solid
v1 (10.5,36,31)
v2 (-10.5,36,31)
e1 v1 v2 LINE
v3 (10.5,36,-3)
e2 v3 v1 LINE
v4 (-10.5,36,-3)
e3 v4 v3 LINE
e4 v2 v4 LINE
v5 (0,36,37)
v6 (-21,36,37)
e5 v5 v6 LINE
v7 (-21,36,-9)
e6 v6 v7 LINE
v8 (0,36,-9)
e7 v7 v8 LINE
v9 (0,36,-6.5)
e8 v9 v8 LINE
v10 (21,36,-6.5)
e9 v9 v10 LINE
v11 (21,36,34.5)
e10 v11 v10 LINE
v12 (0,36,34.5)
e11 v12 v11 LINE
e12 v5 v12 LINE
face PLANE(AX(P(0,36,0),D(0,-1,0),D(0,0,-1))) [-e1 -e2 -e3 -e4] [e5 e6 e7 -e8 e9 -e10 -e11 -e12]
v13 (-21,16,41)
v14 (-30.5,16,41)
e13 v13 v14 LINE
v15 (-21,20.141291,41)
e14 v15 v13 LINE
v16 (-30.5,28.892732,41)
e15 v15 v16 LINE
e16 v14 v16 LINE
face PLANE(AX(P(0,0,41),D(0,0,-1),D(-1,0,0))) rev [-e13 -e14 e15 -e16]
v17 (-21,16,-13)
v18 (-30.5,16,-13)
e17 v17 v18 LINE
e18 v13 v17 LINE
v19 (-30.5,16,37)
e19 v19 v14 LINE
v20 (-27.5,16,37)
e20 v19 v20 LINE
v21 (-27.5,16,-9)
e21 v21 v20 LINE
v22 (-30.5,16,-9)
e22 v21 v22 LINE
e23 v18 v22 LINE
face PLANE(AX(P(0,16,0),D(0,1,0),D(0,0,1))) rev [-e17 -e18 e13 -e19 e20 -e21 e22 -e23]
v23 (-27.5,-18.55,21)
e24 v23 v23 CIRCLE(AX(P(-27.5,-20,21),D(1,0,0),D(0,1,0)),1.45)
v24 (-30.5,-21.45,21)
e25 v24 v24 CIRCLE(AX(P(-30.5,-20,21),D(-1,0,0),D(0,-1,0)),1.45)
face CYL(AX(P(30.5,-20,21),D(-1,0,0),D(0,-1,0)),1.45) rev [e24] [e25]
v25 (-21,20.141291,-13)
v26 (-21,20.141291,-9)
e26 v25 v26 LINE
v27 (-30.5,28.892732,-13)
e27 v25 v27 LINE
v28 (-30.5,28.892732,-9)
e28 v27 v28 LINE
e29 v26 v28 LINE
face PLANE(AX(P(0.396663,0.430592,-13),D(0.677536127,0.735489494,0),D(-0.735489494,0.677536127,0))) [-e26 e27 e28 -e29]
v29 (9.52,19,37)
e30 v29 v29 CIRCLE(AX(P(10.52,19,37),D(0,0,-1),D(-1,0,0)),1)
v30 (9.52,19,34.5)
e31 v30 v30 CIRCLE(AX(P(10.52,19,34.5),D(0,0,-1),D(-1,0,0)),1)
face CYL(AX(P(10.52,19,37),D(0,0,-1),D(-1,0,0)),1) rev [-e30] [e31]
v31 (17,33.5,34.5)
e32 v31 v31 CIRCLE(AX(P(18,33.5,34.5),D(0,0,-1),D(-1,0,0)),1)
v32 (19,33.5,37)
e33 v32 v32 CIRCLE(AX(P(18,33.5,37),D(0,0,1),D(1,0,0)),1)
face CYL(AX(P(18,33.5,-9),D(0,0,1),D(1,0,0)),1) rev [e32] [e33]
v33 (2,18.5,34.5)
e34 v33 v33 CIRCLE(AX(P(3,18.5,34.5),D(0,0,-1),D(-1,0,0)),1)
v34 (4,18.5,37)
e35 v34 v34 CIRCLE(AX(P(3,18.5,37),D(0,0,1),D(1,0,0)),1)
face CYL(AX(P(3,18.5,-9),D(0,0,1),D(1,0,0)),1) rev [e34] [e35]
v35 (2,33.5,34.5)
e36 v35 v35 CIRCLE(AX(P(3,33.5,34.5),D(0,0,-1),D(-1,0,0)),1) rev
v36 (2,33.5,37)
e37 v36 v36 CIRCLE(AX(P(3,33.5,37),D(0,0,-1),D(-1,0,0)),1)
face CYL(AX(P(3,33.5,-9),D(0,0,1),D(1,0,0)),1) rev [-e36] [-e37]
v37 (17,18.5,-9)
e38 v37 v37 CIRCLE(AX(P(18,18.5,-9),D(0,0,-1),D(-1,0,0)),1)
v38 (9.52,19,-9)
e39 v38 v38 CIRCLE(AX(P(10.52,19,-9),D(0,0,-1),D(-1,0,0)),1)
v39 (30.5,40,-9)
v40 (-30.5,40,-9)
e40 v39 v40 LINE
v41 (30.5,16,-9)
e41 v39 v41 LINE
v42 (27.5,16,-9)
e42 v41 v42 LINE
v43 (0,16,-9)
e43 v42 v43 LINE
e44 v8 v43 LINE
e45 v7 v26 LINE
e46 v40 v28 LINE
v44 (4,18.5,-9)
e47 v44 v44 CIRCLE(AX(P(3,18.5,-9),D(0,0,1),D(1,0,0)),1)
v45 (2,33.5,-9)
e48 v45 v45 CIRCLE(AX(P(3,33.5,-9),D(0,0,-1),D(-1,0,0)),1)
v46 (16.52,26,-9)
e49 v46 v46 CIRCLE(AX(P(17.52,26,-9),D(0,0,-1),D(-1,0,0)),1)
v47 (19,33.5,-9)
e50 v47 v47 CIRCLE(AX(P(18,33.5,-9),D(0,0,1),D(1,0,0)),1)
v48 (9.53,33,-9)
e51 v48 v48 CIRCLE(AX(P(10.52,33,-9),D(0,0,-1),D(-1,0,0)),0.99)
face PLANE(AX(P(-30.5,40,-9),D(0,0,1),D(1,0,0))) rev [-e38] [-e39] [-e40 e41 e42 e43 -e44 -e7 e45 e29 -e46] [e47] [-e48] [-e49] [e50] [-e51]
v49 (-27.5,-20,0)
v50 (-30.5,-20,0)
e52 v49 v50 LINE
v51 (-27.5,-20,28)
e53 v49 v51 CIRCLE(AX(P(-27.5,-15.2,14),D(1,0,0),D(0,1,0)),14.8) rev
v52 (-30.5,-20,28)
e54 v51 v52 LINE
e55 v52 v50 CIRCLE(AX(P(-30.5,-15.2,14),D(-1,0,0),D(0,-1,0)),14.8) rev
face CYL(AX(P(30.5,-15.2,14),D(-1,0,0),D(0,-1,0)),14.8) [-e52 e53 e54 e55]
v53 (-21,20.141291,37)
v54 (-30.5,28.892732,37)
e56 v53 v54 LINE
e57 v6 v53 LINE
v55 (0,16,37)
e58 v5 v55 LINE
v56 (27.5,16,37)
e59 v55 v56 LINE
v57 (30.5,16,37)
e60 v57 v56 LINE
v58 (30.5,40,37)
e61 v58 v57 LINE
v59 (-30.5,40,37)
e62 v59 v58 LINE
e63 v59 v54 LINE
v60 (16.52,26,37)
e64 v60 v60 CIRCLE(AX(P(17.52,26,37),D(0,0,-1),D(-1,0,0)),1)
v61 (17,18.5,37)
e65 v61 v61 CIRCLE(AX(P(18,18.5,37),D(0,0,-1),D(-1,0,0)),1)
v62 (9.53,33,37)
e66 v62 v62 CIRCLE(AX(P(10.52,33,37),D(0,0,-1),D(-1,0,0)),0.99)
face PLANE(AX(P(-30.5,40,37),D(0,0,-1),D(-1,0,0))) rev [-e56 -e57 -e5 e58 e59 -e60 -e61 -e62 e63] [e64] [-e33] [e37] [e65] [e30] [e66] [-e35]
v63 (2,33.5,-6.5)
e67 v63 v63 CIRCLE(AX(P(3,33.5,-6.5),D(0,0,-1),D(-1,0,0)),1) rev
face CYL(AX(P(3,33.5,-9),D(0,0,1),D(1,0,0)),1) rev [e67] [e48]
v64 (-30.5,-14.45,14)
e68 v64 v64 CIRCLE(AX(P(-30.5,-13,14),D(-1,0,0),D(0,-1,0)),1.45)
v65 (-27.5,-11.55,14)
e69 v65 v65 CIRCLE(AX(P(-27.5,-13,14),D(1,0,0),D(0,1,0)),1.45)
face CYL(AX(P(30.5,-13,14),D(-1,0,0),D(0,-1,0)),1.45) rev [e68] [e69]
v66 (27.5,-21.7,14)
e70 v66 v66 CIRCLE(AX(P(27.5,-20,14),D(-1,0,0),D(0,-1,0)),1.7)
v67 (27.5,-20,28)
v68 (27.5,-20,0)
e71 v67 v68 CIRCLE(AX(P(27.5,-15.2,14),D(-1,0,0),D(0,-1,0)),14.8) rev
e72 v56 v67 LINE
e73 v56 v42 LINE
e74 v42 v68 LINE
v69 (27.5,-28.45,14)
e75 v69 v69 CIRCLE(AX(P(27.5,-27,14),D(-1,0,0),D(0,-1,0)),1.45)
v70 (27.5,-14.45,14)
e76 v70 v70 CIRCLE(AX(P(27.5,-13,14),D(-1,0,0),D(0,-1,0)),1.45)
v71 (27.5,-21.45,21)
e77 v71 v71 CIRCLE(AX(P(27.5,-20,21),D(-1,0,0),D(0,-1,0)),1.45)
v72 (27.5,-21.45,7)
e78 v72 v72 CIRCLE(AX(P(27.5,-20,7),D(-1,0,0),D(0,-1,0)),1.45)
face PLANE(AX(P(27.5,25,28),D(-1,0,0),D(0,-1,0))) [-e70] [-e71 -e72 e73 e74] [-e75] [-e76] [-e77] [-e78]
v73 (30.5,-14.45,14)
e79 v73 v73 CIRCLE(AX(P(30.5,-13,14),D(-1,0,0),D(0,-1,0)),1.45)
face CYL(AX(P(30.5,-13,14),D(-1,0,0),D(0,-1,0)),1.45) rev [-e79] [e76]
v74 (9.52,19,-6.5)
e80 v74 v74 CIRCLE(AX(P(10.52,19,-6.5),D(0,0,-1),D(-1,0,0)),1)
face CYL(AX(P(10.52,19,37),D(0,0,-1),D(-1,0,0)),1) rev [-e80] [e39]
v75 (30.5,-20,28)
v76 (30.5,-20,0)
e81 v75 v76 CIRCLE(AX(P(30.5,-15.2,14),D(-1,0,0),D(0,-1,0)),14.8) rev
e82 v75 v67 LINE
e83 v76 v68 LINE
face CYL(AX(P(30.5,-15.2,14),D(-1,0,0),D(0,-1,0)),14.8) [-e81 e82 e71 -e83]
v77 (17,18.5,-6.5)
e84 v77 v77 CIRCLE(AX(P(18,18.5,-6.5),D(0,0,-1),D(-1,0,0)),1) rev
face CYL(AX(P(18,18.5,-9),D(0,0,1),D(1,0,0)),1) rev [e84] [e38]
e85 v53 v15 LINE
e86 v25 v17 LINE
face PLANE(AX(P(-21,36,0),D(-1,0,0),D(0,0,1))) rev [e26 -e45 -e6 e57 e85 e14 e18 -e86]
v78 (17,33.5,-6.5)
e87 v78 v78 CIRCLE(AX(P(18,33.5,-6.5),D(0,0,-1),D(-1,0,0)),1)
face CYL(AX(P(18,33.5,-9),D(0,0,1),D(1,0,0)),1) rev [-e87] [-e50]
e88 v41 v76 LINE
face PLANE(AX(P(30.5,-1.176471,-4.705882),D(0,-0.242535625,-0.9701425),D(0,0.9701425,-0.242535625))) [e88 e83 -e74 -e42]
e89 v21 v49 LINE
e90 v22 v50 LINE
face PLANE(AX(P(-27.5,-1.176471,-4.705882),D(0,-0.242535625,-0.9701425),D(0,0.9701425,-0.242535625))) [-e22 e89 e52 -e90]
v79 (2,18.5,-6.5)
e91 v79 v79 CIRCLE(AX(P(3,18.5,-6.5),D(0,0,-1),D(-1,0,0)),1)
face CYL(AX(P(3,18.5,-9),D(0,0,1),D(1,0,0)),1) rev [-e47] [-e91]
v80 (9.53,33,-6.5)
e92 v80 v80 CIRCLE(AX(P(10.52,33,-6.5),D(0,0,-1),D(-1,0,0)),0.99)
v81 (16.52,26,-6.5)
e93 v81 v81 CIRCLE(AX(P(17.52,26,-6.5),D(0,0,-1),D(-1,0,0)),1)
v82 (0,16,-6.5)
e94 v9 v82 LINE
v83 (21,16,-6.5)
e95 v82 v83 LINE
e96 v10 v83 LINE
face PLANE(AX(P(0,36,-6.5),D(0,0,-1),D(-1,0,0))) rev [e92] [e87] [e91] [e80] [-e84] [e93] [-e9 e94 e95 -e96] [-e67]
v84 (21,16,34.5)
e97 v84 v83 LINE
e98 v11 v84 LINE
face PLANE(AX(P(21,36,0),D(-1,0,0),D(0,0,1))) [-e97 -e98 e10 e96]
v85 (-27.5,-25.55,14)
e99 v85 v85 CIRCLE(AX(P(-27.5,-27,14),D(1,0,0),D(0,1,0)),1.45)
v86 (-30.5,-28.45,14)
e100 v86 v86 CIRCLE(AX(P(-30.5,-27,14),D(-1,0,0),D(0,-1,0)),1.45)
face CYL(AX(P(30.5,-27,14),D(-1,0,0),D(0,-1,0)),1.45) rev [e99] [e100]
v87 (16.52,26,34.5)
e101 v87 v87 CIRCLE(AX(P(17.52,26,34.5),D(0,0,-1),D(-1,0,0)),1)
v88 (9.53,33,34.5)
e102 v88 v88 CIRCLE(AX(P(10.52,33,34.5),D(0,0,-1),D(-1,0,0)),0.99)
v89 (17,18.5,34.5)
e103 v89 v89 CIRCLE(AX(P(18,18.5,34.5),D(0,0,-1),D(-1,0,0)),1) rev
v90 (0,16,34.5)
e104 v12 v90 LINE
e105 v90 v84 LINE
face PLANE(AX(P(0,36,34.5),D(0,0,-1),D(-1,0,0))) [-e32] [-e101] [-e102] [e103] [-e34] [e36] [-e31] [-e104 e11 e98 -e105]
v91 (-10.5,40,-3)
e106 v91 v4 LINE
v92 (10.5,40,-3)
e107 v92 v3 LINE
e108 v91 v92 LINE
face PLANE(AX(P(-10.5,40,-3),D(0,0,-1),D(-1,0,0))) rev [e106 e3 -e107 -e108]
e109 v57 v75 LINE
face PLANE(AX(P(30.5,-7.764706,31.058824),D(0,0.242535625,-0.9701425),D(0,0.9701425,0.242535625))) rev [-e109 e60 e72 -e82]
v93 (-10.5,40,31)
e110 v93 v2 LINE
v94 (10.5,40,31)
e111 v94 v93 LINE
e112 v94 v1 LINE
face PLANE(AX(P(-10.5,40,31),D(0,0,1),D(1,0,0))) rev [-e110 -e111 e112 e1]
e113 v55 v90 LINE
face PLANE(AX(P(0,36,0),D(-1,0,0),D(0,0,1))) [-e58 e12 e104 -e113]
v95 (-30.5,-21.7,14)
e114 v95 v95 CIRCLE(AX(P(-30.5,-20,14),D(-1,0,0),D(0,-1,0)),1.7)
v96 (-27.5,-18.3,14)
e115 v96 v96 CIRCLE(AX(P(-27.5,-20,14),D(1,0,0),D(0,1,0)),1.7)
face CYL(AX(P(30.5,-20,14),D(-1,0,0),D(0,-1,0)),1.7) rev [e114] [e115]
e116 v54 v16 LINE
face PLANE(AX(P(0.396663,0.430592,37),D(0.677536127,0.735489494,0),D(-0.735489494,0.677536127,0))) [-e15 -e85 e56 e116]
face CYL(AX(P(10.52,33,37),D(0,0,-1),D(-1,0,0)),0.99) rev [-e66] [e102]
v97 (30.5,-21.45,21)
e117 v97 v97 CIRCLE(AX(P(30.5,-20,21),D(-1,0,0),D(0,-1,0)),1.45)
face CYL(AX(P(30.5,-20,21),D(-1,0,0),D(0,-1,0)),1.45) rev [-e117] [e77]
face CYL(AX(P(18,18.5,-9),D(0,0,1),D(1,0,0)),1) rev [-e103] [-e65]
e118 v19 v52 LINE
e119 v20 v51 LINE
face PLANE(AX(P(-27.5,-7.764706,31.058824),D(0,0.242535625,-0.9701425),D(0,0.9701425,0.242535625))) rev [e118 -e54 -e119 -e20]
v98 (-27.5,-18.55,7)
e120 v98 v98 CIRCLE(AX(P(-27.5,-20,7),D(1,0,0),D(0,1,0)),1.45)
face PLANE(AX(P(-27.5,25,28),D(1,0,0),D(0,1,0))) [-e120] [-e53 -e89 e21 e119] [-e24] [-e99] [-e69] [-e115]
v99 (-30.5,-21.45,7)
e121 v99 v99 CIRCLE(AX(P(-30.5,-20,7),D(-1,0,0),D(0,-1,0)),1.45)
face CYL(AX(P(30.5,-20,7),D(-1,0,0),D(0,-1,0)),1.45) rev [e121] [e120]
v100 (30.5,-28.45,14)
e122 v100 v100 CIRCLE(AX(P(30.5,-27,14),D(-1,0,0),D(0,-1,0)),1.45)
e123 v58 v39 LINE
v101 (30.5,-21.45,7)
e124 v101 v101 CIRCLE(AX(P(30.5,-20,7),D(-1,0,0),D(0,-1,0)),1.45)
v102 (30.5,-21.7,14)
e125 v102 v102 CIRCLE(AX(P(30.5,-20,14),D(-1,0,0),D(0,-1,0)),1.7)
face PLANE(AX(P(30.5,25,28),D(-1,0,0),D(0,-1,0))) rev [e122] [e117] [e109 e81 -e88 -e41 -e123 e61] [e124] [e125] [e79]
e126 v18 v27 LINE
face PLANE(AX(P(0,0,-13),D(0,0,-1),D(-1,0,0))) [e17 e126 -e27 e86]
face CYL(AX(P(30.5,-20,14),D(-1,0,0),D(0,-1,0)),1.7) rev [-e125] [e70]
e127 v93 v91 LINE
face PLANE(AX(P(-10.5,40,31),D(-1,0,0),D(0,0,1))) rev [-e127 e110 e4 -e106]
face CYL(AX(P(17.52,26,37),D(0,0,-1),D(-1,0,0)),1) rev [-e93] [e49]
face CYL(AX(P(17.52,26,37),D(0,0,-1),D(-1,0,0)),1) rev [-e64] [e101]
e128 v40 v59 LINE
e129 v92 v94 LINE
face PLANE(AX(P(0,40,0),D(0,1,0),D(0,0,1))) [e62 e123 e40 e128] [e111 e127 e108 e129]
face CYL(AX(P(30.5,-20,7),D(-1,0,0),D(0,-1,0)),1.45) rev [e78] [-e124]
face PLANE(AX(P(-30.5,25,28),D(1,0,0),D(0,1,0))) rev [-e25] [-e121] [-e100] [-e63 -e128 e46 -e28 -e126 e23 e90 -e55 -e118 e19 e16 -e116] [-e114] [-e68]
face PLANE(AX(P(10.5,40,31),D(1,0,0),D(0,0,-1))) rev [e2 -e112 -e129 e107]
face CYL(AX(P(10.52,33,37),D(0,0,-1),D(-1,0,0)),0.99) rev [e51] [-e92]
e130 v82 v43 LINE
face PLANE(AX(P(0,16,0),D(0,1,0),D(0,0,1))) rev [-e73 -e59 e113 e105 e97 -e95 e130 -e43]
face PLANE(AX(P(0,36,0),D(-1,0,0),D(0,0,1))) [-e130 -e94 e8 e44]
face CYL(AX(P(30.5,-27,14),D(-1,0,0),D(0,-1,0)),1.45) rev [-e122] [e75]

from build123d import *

# Parameters (mm, degrees)
SM_BASE_FLANGE_2_DEPTH = 28
SKETCH_15_W            = 61
SKETCH_15_H            = 46
EXTRUDE_1_DEPTH        = 12
SKETCH_18_W            = 21
SKETCH_18_H            = 2.5
SKETCH_18_W_2          = 42
SKETCH_18_H_2          = 41
CUT_EXTRUDE_1_DEPTH    = 20
SKETCH_19_R            = 1
CUT_EXTRUDE_2_DEPTH    = 69.163406605
SKETCH_20_W            = 21
SKETCH_20_H            = 34
CUT_EXTRUDE_3_DEPTH    = 4
EXTRUDE_2_DEPTH        = 3
PATTERN_LINEAR_1_COUNT = 2
PATTERN_LINEAR_1_PITCH = 58
SKETCH_23_R            = 1.45
SKETCH_23_R_2          = 1.7
CUT_EXTRUDE_4_DEPTH    = 82.792420187
SKETCH_24_R            = 1
SKETCH_24_R_2          = 0.99
CUT_EXTRUDE_5_DEPTH    = 69.163406605
EXTRUDE_3_DEPTH        = 4
PATTERN_LINEAR_2_COUNT = 2
PATTERN_LINEAR_2_PITCH = 50


# Sheet-metal steps are written as plain solids
with BuildPart() as part:
    # 草图1 → 基体-法兰2 (new body)
    with BuildSketch(Plane.XY):
        with BuildLine():
            Line((-27.5, -30), (-27.5, 23))
            ThreePointArc((-27.5, 23), (-26.914213562, 24.414213562), (-25.5, 25))
            Line((-25.5, 25), (25.5, 25))
            ThreePointArc((25.5, 25), (26.914213562, 24.414213562), (27.5, 23))
            Line((27.5, 23), (27.5, -30))
            Line((27.5, -30), (30.5, -30))
            Line((30.5, -30), (30.5, 23))
            ThreePointArc((30.5, 23), (29.035533906, 26.535533906), (25.5, 28))
            Line((25.5, 28), (-25.5, 28))
            ThreePointArc((-25.5, 28), (-29.035533906, 26.535533906), (-30.5, 23))
            Line((-30.5, 23), (-30.5, -30))
            Line((-30.5, -30), (-27.5, -30))
        make_face()
    extrude(amount=SM_BASE_FLANGE_2_DEPTH)

    # 草图15 → 凸台-拉伸1 (add, symmetric)
    with BuildSketch(Plane(origin=(0, 28, 0), x_dir=(1, 0, 0), z_dir=(0, 1, 0))):
        with Locations((0, -14)):
            Rectangle(SKETCH_15_W, SKETCH_15_H)
    extrude(amount=EXTRUDE_1_DEPTH, both=True)

    # 草图18 → 切除-拉伸1 (cut)
    with BuildSketch(Plane.XZ.offset(-16)):
        with Locations((-10.5, 35.75)):
            Rectangle(SKETCH_18_W, SKETCH_18_H)
        with Locations((0, 14)):
            Rectangle(SKETCH_18_W_2, SKETCH_18_H_2)
        with Locations((-10.5, -7.75)):
            Rectangle(SKETCH_18_W, SKETCH_18_H)
    extrude(amount=-CUT_EXTRUDE_1_DEPTH, mode=Mode.SUBTRACT)

    # 草图19 → 切除-拉伸2 (cut, through all)
    with BuildSketch(Plane.XY.offset(37)):
        with Locations((3, 18.5)):
            Circle(SKETCH_19_R)
        with Locations(Location((18, 18.5, 0), (0, 0, 180))):
            Circle(SKETCH_19_R)
        with Locations((18, 33.5)):
            Circle(SKETCH_19_R)
        with Locations(Location((3, 33.5, 0), (0, 0, 180))):
            Circle(SKETCH_19_R)
    extrude(amount=-CUT_EXTRUDE_2_DEPTH, mode=Mode.SUBTRACT)

    # 草图20 → 切除-拉伸3 (cut)
    with BuildSketch(Plane.XZ.offset(-36)):
        with Locations((0, 14)):
            Rectangle(SKETCH_20_W, SKETCH_20_H)
    extrude(amount=-CUT_EXTRUDE_3_DEPTH, mode=Mode.SUBTRACT)

    # 草图21 → 凸台-拉伸2 (add)
    with BuildSketch(Plane.ZY.offset(30.5)):
        Polygon((0, 16), (-9, 16), (0, -20), align=None)
        Polygon((28, 16), (28, -20), (37, 16), align=None)
    extrude_2 = extrude(amount=-EXTRUDE_2_DEPTH)

    # 阵列(线性)1: 凸台-拉伸2 ×2
    with Locations(*[(i * PATTERN_LINEAR_1_PITCH, 0, 0) for i in range(1, PATTERN_LINEAR_1_COUNT)]):
        add(extrude_2)

    # 草图23 → 切除-拉伸4 (cut, through all)
    with BuildSketch(Plane.ZY.offset(30.5)):
        with Locations(Location((14, -13, 0), (0, 0, 270))):
            Circle(SKETCH_23_R)
        with Locations(Location((7, -20, 0), (0, 0, 270))):
            Circle(SKETCH_23_R)
        with Locations(Location((14, -20, 0), (0, 0, 270))):
            Circle(SKETCH_23_R_2)
        with Locations(Location((21, -20, 0), (0, 0, 270))):
            Circle(SKETCH_23_R)
        with Locations(Location((14, -27, 0), (0, 0, 270))):
            Circle(SKETCH_23_R)
        with BuildLine():
            Line((0, -30), (14, -30))
            ThreePointArc((14, -30), (5.397674733, -27.243255374), (0, -20))
            Line((0, -20), (0, -30))
        make_face()
        with BuildLine():
            Line((14, -30), (28, -30))
            Line((28, -30), (28, -20))
            ThreePointArc((28, -20), (22.602325267, -27.243255374), (14, -30))
        make_face()
    extrude(amount=-CUT_EXTRUDE_4_DEPTH, mode=Mode.SUBTRACT)

    # 草图24 → 切除-拉伸5 (cut, through all)
    with BuildSketch(Plane(origin=(0, 0, -9), x_dir=(-1, 0, 0), z_dir=(0, 0, -1))):
        with Locations((-17.52, 26)):
            Circle(SKETCH_24_R)
        with Locations((-10.52, 19)):
            Circle(SKETCH_24_R)
        with Locations((-10.52, 33)):
            Circle(SKETCH_24_R_2)
    extrude(amount=-CUT_EXTRUDE_5_DEPTH, mode=Mode.SUBTRACT)

    # 草图25 → 凸台-拉伸3 (add)
    with BuildSketch(Plane(origin=(0, 0, -9), x_dir=(-1, 0, 0), z_dir=(0, 0, -1))):
        Polygon((30.5, 28.892731946), (21, 20.141290546), (21, 16), (27.5, 16), (30.5, 16), align=None)
    extrude_3 = extrude(amount=EXTRUDE_3_DEPTH)

    # 阵列(线性)2: 凸台-拉伸3 ×2
    with Locations(*[(0, 0, i * PATTERN_LINEAR_2_PITCH) for i in range(1, PATTERN_LINEAR_2_COUNT)]):
        add(extrude_3)


solid = part.part
